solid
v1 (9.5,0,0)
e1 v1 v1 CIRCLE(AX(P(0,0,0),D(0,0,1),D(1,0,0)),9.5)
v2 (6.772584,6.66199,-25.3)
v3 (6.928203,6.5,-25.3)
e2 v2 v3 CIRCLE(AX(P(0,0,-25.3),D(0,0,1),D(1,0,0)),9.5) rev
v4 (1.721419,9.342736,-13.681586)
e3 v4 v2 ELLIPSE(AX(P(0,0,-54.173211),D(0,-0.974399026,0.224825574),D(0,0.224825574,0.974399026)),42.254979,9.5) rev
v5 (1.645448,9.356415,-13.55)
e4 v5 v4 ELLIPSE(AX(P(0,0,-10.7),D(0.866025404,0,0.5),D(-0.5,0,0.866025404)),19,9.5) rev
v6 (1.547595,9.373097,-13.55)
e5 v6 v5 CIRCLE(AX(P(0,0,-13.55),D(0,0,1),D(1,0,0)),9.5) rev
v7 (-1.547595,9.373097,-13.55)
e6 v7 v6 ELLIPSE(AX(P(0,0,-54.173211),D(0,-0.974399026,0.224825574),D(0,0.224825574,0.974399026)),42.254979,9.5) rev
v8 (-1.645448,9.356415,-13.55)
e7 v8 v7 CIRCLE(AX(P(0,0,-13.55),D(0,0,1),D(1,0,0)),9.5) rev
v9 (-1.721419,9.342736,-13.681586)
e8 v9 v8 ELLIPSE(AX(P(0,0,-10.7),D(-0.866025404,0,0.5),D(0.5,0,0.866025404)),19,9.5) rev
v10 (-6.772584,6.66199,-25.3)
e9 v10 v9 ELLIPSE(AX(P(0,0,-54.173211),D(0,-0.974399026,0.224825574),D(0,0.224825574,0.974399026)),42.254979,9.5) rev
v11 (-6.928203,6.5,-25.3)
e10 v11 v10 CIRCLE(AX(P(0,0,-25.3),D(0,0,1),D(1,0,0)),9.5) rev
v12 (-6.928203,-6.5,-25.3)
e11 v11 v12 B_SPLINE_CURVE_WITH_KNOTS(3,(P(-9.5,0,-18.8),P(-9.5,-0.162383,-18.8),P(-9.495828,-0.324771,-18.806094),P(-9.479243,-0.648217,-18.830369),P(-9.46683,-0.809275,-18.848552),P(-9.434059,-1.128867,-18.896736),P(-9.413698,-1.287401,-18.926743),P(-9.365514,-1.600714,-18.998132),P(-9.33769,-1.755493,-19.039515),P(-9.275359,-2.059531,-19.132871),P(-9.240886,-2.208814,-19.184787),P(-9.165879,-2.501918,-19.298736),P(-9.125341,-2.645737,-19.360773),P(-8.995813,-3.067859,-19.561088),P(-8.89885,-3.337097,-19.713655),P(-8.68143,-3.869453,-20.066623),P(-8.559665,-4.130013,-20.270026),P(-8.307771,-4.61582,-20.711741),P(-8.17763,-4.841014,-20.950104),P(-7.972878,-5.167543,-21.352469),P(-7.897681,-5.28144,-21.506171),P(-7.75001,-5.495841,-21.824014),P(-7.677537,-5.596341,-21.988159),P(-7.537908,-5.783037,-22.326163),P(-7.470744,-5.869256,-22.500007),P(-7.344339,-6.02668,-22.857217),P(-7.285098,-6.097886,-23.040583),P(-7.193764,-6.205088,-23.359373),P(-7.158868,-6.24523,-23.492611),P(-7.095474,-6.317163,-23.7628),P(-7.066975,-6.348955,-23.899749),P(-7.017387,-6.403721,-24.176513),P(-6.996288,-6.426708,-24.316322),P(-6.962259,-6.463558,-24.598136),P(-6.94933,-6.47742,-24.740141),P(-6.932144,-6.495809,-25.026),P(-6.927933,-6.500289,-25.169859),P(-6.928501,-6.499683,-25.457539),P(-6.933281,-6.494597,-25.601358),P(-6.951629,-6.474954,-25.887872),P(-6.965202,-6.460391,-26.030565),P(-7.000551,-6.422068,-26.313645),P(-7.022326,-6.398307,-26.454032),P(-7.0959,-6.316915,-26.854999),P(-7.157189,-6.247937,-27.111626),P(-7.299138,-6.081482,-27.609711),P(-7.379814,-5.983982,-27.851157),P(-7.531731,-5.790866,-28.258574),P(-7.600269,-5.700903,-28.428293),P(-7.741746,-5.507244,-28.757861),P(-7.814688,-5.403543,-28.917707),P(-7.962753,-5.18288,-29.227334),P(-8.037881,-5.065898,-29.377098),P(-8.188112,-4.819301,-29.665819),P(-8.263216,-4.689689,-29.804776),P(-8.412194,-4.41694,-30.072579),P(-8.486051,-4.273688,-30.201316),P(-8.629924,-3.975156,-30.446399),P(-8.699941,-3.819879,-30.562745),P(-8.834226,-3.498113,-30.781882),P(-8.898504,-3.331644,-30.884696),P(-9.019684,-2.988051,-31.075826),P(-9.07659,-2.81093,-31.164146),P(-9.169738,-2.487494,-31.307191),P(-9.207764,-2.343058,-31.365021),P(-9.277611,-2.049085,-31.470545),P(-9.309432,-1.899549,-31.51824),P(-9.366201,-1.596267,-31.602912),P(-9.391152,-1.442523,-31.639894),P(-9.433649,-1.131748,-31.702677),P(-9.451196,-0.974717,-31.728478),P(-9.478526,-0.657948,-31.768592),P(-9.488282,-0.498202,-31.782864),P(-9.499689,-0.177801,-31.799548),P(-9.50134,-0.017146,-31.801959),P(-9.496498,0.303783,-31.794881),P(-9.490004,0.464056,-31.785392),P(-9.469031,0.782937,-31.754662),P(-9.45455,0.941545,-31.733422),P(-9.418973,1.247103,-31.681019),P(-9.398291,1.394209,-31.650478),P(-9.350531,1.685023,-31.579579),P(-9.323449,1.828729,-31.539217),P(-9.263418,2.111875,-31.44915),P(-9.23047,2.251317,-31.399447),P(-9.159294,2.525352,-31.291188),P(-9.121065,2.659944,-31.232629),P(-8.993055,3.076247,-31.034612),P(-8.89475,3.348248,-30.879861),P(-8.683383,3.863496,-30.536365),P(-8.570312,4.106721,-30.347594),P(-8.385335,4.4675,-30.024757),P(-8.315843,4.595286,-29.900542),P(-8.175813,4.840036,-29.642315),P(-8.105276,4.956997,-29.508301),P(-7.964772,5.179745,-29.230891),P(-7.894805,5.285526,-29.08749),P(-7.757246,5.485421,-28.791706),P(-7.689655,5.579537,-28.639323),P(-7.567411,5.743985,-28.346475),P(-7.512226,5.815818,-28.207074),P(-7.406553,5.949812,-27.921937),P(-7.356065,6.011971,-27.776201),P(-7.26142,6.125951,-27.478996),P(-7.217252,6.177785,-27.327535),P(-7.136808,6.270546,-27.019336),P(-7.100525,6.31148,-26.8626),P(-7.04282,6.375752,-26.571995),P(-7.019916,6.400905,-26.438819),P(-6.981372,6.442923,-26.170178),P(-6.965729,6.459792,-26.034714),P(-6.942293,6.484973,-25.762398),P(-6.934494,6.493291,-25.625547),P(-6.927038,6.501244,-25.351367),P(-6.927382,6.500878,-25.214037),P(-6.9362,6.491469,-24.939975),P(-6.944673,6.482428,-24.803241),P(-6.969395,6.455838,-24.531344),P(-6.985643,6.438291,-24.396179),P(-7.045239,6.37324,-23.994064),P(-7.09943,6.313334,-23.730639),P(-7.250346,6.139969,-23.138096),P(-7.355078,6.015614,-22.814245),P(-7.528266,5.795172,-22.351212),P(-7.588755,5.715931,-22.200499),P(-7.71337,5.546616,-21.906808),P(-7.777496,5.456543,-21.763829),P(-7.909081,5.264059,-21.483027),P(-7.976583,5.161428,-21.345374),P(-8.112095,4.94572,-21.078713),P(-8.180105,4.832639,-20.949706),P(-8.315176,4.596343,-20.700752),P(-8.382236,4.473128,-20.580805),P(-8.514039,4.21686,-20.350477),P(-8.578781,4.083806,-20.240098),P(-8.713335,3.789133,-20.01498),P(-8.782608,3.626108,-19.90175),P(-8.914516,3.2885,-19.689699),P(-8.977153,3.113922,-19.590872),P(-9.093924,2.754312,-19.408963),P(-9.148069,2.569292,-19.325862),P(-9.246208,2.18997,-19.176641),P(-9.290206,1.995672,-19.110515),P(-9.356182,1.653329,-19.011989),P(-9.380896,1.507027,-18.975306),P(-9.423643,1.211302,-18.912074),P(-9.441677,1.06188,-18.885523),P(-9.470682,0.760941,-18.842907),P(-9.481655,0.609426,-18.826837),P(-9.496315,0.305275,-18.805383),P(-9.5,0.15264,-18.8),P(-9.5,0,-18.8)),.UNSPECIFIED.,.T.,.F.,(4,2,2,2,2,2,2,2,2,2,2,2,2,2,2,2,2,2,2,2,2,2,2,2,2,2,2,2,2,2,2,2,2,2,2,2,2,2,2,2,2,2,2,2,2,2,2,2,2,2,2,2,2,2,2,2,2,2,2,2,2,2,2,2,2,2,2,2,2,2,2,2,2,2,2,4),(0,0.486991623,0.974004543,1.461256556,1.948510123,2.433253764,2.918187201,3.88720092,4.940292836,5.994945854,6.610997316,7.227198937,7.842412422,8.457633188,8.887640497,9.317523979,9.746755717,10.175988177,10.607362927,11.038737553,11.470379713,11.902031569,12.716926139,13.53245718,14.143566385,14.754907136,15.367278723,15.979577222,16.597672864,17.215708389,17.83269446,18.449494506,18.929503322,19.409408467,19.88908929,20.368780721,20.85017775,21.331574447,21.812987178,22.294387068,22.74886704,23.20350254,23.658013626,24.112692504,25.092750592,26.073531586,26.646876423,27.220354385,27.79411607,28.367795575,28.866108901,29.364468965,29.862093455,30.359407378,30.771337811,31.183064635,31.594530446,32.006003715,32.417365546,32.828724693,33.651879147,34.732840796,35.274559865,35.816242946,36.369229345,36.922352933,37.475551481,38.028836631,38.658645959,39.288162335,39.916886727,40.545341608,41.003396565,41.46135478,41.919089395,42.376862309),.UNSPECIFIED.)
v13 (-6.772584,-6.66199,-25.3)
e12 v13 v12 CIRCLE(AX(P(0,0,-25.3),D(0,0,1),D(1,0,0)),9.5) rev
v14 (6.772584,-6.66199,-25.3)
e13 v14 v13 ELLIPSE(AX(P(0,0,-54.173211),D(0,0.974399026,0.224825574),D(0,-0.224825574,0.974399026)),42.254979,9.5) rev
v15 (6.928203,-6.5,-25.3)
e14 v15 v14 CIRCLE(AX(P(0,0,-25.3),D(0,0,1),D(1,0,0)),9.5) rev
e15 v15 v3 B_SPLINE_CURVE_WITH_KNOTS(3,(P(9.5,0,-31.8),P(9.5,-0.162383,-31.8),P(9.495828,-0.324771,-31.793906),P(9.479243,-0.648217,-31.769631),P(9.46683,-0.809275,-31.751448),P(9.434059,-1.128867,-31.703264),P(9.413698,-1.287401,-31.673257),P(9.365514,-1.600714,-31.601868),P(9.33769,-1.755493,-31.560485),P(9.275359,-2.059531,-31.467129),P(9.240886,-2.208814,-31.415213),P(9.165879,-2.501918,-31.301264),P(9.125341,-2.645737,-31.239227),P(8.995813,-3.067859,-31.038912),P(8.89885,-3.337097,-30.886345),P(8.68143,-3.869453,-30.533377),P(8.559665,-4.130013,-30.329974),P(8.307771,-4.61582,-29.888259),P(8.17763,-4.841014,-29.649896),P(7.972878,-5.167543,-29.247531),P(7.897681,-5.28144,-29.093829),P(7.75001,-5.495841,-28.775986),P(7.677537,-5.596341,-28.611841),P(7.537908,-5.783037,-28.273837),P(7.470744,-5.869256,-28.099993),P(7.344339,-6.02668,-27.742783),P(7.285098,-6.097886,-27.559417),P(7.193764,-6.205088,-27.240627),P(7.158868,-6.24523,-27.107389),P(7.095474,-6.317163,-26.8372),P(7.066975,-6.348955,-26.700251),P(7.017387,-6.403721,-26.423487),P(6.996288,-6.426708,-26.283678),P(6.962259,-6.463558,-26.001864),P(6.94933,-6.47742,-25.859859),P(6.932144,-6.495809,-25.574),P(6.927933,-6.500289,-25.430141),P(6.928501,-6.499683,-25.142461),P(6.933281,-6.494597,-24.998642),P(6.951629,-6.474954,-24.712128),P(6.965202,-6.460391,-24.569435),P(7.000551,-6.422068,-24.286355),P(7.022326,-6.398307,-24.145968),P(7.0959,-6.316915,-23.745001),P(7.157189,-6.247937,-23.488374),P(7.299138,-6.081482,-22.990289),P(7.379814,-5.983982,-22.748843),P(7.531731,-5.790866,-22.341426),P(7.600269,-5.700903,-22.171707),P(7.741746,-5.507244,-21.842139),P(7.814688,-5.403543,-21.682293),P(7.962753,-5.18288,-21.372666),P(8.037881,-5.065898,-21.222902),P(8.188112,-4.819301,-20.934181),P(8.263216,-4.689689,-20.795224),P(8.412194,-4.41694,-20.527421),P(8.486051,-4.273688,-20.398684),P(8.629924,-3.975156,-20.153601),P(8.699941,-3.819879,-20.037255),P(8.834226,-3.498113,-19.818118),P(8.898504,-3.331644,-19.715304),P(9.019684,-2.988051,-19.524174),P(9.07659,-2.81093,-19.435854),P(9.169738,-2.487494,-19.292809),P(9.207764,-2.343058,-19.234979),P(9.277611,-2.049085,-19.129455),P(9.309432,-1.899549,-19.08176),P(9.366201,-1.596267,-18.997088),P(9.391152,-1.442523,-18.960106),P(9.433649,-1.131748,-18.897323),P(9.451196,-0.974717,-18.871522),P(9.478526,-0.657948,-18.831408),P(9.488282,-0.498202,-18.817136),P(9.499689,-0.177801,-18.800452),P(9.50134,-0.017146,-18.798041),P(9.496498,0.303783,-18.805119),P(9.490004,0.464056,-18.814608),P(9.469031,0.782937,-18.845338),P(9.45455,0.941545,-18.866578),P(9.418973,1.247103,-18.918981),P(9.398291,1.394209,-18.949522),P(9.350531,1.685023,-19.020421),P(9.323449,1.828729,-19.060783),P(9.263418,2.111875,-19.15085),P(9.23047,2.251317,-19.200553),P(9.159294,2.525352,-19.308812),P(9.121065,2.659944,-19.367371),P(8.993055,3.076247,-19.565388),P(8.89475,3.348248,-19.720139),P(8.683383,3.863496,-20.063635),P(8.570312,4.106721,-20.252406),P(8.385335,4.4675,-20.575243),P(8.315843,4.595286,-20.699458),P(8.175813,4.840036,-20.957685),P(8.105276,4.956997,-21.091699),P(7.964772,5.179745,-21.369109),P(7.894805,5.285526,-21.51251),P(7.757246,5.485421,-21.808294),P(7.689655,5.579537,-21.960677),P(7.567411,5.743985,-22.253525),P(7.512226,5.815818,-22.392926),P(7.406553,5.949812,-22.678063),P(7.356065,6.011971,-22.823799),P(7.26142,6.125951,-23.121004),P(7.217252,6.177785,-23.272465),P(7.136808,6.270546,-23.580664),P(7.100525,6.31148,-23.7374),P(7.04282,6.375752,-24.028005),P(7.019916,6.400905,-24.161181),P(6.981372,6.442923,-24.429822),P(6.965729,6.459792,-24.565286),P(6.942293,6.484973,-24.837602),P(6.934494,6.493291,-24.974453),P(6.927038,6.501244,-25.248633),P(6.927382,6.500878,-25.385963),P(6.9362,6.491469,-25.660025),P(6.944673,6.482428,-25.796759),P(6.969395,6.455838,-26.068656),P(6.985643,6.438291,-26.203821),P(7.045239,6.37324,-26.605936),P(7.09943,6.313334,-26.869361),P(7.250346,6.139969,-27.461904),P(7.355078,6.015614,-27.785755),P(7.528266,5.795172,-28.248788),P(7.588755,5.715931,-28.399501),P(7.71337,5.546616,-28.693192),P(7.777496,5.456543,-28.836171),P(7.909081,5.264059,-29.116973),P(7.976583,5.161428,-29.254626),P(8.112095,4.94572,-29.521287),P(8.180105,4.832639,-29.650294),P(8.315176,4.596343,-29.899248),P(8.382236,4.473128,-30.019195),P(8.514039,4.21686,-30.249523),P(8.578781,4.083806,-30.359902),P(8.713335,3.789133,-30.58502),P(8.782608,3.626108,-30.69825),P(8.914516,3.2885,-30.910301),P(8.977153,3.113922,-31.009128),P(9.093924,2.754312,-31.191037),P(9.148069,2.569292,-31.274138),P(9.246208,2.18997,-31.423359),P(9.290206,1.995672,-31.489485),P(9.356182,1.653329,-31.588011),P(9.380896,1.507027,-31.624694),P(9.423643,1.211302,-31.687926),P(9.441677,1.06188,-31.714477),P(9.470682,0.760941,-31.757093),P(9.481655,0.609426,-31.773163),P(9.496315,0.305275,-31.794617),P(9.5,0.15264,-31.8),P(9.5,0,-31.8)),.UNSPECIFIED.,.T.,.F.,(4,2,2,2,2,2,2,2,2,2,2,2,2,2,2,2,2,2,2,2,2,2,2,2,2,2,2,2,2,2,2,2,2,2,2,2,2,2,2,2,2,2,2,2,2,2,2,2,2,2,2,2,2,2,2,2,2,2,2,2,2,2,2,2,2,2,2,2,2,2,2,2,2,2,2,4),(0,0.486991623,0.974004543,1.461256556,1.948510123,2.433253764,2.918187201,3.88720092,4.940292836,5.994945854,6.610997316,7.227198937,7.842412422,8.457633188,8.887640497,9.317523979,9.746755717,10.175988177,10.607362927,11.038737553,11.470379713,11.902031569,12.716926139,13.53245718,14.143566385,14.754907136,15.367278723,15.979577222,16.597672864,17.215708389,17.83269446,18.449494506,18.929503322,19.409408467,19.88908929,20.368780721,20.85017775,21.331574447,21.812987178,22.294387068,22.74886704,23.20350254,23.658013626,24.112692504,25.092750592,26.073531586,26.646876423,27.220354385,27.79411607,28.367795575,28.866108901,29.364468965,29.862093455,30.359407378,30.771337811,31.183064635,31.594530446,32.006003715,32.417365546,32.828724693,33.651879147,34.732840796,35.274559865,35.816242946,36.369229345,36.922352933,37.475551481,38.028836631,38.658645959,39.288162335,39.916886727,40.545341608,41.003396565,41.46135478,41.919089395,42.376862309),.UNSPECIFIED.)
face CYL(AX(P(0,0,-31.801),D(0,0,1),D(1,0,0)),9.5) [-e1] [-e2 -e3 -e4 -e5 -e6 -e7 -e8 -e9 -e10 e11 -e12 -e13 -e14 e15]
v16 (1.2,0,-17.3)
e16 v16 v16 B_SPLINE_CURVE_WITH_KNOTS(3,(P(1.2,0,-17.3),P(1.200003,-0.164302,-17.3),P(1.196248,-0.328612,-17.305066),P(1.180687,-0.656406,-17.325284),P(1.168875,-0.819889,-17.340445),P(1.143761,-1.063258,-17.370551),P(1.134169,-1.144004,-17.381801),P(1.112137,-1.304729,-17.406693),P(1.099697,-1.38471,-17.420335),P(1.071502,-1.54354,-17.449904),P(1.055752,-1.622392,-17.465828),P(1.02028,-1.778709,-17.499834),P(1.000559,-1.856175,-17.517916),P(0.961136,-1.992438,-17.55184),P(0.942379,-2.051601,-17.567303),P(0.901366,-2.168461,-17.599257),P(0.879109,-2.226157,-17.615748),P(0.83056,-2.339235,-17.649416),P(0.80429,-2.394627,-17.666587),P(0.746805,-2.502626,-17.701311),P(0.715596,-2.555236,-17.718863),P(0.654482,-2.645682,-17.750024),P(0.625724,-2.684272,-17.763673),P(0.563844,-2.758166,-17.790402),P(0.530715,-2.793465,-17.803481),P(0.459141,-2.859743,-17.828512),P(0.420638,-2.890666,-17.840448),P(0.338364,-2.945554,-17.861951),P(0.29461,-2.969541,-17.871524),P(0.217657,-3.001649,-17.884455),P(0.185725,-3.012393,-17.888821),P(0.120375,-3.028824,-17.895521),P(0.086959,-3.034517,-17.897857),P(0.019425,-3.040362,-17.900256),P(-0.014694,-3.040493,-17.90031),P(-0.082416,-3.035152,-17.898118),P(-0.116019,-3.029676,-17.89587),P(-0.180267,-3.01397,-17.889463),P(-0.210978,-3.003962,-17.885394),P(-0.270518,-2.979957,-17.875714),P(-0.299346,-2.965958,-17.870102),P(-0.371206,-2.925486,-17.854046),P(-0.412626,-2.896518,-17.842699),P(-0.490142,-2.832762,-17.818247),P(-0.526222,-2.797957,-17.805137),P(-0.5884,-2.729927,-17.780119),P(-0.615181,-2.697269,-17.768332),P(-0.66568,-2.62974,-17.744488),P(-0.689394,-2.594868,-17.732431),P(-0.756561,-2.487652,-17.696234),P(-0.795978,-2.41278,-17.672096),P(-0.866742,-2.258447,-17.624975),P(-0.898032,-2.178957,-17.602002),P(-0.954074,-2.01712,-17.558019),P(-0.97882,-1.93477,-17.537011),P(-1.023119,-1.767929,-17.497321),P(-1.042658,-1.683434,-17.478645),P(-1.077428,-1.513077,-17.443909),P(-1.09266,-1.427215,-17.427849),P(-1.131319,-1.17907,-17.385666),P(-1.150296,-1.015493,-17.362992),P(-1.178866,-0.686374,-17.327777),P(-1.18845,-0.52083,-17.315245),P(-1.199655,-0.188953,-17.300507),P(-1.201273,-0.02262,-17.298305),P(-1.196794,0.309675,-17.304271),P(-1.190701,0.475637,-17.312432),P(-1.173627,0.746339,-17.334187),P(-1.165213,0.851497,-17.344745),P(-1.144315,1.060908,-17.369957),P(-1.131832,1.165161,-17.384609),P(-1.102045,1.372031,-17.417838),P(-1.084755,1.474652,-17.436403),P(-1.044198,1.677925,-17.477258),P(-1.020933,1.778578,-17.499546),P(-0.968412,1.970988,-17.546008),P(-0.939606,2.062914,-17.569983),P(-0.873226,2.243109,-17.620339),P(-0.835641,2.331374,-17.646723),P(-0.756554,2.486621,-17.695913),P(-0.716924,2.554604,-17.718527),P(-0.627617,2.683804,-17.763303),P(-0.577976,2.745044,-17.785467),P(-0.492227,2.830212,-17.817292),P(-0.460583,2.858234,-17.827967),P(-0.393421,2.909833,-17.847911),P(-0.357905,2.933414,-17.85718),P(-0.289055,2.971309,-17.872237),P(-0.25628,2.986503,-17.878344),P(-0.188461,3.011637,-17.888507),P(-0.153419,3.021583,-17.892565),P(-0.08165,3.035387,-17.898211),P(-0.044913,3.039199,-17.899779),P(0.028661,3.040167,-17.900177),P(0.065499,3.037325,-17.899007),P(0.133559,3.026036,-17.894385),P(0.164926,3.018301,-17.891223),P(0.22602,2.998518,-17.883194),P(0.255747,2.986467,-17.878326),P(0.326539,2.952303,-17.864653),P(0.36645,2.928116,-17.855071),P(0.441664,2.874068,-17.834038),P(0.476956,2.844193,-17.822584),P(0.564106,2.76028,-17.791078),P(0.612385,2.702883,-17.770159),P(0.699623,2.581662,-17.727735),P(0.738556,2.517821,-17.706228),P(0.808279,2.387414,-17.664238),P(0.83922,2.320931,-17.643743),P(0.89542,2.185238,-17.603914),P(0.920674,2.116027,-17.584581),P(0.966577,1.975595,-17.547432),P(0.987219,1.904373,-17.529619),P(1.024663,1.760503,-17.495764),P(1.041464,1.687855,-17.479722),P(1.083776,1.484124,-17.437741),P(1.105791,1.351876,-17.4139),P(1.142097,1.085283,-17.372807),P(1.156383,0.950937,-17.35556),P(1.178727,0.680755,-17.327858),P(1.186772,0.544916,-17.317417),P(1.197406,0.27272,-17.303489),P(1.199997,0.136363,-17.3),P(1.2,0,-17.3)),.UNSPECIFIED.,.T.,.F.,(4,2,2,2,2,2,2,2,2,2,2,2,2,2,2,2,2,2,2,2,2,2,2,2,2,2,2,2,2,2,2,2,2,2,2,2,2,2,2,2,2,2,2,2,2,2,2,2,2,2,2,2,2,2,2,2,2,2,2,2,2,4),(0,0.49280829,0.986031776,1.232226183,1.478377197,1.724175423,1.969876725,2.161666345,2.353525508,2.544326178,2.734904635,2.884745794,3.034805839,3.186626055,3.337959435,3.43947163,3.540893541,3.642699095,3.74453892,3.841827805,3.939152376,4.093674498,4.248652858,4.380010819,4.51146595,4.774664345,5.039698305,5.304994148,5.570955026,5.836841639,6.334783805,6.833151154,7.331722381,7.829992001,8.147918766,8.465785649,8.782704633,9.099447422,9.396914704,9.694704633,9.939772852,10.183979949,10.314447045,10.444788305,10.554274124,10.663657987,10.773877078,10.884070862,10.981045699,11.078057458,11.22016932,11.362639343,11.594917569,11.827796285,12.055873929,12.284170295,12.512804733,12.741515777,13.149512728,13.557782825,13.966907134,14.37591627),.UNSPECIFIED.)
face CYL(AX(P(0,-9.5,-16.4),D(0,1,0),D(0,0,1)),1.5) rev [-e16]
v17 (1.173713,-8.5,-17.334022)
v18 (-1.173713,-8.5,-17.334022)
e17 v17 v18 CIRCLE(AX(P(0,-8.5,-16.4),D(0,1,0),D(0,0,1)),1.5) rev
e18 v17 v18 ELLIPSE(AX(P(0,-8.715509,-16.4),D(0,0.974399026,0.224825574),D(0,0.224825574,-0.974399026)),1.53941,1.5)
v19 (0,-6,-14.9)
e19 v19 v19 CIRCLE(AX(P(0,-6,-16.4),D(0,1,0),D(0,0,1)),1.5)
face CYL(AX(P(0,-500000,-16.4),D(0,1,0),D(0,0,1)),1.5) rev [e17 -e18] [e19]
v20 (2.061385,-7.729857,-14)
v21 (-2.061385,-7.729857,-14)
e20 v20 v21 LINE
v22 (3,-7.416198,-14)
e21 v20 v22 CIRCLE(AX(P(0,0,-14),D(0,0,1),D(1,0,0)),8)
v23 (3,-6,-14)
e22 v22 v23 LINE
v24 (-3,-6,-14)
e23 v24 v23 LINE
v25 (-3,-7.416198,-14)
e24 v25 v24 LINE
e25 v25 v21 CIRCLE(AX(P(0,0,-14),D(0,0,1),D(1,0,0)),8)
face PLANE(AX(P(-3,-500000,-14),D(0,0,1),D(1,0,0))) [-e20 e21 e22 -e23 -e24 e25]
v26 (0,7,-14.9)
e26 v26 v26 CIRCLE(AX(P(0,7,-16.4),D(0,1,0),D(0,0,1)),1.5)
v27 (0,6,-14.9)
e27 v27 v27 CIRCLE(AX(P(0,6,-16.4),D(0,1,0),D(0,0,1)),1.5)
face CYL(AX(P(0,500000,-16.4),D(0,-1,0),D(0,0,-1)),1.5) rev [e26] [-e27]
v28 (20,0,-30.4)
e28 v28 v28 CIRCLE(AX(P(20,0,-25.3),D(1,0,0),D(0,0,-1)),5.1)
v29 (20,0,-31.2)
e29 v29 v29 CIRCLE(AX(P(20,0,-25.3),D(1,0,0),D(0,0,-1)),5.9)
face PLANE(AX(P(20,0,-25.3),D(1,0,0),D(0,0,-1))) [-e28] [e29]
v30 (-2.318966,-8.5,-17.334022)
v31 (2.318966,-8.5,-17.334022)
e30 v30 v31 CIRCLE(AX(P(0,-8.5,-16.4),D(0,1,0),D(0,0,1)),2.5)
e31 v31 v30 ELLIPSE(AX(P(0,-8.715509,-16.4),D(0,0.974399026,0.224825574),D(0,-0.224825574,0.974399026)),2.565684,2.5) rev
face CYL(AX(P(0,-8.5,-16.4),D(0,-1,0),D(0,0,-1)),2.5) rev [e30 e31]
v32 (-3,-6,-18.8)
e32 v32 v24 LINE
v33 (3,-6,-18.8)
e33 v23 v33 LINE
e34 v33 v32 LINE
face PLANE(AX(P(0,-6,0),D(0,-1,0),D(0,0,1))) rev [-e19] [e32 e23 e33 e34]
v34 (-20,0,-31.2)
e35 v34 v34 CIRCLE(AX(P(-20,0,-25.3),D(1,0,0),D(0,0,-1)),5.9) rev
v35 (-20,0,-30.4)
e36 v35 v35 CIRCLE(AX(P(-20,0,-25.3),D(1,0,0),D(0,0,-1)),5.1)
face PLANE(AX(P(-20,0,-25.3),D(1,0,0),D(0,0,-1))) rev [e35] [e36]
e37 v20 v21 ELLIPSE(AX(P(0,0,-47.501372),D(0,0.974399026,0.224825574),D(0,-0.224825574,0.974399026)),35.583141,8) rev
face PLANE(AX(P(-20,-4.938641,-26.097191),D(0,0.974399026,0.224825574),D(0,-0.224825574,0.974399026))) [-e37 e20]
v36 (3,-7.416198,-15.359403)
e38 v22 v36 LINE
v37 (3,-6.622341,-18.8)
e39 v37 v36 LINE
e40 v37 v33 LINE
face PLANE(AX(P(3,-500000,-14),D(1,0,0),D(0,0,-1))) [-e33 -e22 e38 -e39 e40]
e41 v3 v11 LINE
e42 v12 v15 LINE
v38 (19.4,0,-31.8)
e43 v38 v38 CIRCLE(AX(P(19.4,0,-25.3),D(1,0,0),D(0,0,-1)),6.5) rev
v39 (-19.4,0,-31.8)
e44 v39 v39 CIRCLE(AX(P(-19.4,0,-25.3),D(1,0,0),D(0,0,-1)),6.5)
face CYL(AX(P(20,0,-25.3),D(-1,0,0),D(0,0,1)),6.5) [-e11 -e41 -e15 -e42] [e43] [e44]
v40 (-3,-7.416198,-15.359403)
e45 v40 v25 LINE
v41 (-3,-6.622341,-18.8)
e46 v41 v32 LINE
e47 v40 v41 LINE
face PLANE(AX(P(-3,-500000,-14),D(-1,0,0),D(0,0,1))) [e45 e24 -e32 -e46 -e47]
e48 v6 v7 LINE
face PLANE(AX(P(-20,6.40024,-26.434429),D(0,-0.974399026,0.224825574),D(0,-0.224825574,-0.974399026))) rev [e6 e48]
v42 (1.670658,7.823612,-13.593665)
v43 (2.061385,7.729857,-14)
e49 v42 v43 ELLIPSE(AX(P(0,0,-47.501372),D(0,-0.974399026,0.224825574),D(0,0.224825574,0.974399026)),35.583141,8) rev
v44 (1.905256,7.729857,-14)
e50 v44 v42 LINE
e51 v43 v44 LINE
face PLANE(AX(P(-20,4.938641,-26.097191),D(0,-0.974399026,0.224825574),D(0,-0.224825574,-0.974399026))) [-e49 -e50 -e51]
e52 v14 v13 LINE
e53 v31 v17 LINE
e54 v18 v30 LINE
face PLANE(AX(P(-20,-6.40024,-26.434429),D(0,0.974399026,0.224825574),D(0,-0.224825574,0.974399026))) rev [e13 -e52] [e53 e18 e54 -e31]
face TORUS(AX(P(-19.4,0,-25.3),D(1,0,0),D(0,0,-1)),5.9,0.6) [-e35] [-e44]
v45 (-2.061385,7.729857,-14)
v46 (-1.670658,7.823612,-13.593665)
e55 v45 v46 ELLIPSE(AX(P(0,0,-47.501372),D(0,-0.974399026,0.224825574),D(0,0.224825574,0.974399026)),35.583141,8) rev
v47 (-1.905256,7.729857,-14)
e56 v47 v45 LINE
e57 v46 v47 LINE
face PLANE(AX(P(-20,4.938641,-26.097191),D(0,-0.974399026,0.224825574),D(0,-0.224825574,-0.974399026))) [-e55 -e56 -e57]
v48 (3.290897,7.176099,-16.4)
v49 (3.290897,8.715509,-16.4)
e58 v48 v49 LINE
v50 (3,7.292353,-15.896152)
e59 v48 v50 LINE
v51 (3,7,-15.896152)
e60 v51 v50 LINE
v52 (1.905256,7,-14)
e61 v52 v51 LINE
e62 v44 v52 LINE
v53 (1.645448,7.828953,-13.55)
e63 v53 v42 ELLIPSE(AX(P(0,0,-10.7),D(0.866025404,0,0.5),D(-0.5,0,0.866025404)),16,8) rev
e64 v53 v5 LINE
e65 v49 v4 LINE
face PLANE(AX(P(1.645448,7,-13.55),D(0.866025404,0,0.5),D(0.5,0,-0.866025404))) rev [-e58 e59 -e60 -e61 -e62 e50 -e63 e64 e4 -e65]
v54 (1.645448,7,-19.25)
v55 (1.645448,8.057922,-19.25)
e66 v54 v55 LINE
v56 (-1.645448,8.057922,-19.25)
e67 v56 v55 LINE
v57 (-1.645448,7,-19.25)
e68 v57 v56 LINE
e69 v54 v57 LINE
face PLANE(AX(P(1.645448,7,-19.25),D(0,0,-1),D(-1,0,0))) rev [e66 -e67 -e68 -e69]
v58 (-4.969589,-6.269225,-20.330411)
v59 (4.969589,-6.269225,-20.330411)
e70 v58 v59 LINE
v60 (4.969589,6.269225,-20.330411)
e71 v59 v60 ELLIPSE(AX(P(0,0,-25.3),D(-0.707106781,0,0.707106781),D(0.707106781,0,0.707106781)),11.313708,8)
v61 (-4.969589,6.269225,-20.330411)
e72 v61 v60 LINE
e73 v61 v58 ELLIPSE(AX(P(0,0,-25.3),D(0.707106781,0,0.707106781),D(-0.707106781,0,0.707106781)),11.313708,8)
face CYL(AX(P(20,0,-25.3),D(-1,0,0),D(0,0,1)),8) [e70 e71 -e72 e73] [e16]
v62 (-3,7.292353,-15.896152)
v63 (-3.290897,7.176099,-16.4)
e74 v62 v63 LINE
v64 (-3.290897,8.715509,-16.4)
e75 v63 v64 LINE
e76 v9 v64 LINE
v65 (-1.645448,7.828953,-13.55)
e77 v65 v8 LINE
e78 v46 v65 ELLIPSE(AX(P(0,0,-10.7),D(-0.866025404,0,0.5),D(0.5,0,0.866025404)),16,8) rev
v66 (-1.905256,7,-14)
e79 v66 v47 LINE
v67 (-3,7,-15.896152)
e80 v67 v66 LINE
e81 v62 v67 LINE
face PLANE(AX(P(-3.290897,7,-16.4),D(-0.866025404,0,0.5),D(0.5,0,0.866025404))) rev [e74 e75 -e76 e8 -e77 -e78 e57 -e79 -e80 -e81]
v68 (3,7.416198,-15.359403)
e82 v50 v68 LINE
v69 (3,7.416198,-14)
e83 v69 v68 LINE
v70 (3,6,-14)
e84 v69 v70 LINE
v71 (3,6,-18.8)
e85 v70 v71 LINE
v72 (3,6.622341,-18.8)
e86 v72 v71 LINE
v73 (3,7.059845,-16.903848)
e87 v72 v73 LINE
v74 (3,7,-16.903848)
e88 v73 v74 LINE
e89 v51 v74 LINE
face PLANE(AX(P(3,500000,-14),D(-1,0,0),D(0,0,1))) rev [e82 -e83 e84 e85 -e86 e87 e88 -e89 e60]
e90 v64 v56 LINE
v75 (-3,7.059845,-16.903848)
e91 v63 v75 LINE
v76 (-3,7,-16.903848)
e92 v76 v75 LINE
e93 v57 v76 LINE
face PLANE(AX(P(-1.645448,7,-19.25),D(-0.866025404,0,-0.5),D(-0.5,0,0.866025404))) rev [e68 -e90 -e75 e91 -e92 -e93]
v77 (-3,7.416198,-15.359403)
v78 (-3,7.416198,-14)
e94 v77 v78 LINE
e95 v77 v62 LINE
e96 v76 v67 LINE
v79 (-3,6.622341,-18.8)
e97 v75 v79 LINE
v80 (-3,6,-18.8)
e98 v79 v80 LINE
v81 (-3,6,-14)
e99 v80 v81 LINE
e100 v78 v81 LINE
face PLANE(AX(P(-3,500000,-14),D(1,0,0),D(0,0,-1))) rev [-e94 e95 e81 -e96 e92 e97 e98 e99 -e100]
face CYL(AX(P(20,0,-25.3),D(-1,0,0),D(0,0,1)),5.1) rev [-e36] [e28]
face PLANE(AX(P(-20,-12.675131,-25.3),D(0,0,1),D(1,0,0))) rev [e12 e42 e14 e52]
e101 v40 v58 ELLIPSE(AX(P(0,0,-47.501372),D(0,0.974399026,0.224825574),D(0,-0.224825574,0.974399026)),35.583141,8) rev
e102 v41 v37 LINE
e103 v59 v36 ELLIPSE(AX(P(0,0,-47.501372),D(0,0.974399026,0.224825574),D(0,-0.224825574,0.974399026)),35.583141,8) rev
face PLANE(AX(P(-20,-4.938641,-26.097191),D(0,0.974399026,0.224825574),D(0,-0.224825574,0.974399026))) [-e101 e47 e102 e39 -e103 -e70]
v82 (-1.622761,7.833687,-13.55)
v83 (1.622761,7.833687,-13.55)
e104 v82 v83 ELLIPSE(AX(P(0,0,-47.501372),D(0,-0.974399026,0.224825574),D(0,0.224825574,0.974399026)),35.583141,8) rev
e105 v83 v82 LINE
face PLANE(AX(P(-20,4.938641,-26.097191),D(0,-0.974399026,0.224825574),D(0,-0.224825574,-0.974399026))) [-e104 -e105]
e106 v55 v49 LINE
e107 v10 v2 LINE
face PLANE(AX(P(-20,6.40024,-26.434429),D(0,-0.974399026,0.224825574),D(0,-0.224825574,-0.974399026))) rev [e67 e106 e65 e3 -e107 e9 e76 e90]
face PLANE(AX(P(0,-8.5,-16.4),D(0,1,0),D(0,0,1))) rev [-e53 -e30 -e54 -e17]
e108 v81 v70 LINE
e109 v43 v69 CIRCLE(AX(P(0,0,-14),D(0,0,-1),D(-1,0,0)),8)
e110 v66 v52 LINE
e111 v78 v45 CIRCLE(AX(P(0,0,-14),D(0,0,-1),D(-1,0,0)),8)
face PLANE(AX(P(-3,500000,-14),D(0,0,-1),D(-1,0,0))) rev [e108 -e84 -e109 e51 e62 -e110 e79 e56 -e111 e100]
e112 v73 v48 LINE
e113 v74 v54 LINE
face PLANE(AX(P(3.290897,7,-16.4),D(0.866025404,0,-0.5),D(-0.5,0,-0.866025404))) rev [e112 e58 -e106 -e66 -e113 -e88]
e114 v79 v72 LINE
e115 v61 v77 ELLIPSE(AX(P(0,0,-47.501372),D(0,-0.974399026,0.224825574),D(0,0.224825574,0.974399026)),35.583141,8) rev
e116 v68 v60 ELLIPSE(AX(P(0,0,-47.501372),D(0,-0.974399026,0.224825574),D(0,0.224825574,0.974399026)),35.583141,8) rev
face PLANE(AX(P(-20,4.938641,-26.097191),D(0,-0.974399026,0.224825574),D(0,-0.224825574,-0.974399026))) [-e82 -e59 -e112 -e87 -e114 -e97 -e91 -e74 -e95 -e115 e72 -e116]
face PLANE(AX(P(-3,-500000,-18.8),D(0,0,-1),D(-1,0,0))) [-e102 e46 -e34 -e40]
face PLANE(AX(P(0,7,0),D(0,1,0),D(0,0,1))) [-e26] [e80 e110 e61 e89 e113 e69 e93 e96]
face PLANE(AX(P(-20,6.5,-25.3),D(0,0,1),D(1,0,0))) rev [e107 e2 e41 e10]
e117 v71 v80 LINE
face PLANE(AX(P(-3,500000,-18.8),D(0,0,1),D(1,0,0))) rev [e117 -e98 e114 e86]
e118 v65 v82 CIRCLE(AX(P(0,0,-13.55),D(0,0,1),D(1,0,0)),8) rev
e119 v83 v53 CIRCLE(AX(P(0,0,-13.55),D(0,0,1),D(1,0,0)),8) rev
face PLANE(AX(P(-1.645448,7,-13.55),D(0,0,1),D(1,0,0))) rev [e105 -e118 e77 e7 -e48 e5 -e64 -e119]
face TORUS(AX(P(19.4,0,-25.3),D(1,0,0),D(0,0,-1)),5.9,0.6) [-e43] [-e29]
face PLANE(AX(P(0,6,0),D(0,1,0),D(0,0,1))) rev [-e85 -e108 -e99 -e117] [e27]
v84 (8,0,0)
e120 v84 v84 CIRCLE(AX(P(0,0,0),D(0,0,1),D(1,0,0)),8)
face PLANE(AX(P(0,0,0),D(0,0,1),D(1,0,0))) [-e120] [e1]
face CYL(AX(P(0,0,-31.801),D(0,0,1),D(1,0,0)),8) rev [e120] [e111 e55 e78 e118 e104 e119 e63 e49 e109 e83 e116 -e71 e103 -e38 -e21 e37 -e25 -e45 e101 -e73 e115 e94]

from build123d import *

# Parameters (mm, degrees)
SKETCH_3_R               = 6.5
SKETCH_3_R_2             = 5.1
EXTRUDE_1_DEPTH          = 20
EXTRUDE_START            = -18.7999999
EXTRUDE_2_OUTLINE_R      = 9.5
EXTRUDE_2_DEPTH          = 18.7999999
EXTRUDE_START_2          = -31.801
EXTRUDE_2_2_OUTLINE_R    = 9.5
EXTRUDE_2_2_DEPTH        = 0.0009999
EXTRUDE_START_3          = -31.8000001
EXTRUDE_2_3_OUTLINE_R    = 9.5
EXTRUDE_2_3_DEPTH        = 13.0000002
EXTRUDE_START_4          = -9.5000001
EXTRUDE_2_4_OUTLINE_R    = 6.5
EXTRUDE_2_4_DEPTH        = 19.5000001
CUT_EXTRUDE_1_DEPTH      = 39.749885281
CUT_EXTRUDE_1_DEPTH_BACK = 39.749885281
CUT_EXTRUDE_2_DEPTH      = 39.749064529
CUT_EXTRUDE_2_DEPTH_BACK = 39.749064529
SHELL_1_T                = -1.5
FILLET_1_R               = 0.6
EXTRUDE_START_5          = 6
SKETCH_6_W               = 4.8
SKETCH_6_H               = 6
SKETCH_6_R               = 1.5
EXTRUDE_3_DEPTH          = 1.729857
CUT_EXTRUDE_3_DEPTH      = 39.749064611
CUT_EXTRUDE_3_DEPTH_BACK = 39.749064611
SKETCH_6_2_R             = 1.5
CUT_EXTRUDE_START        = 9.5
CUT_EXTRUDE_4_DEPTH      = 2.5
CUT_EXTRUDE_START_2      = -9.5
SKETCH_8_R               = 2.5
CUT_EXTRUDE_5_DEPTH      = 1


with BuildPart() as part:
    # 草圖3 → 填料-伸長1 (new, symmetric)
    with BuildSketch(Plane(origin=(0, 0, 0), x_dir=(0, 0, -1), z_dir=(1, 0, 0))):
        with Locations((25.3, 0)):
            Circle(SKETCH_3_R)
        with Locations((25.3, 0)):
            Circle(SKETCH_3_R_2, mode=Mode.SUBTRACT)
    extrude(amount=EXTRUDE_1_DEPTH, both=True)

    # 圓角1
    fillet_1_edges = [part.edges().sort_by_distance(p)[0] for p in [
        (-20, 0, -18.8),
        (20, 0, -18.8),
    ]]
    fillet(fillet_1_edges, radius=FILLET_1_R)



with BuildPart() as body_2:
    # 填料-伸長2: read off the stored shape, not the designer's step
    # 填料-伸長2 outline → 填料-伸長2 (new body)
    with BuildSketch(Plane.XY.offset(EXTRUDE_START)):
        Circle(EXTRUDE_2_OUTLINE_R)
    extrude(amount=EXTRUDE_2_DEPTH)

    # Extrude 2 2 outline → Extrude 2 2 (add)
    with BuildSketch(Plane.XY.offset(EXTRUDE_START_2)):
        Circle(EXTRUDE_2_2_OUTLINE_R)
    extrude(amount=EXTRUDE_2_2_DEPTH)

    # Extrude 2 3 outline → Extrude 2 3 (add)
    with BuildSketch(Plane.XY.offset(EXTRUDE_START_3)):
        Circle(EXTRUDE_2_3_OUTLINE_R)
    extrude(amount=EXTRUDE_2_3_DEPTH)

    # Extrude 2 4 outline → Extrude 2 4 (cut)
    with BuildSketch(Plane.YZ.offset(EXTRUDE_START_4)):
        with Locations((0, -25.3)):
            Circle(EXTRUDE_2_4_OUTLINE_R)
    extrude(amount=EXTRUDE_2_4_DEPTH, mode=Mode.SUBTRACT)

    # 草圖4 → 除料-伸長1 (cut, two sides: drawn at the far end of the back side and taken through both)
    with BuildSketch(Plane(origin=(0, 0, 0), x_dir=(0, 0, -1), z_dir=(1, 0, 0)).offset(-CUT_EXTRUDE_1_DEPTH_BACK)):
        with BuildLine():
            Line((25.3, -12.675131419), (25.3, -6.5))
            ThreePointArc((25.3, -6.5), (31.8, 0), (25.3, 6.5))
            Line((25.3, 6.5), (25.3, 12.675131419))
            ThreePointArc((25.3, 12.675131419), (37.975131419, 0), (25.3, -12.675131419))
        make_face()
    extrude(amount=CUT_EXTRUDE_1_DEPTH + CUT_EXTRUDE_1_DEPTH_BACK, mode=Mode.SUBTRACT)

    # 草圖5 → 除料-伸長2 (cut, two sides: drawn at the far end of the back side and taken through both)
    with BuildSketch(Plane(origin=(0, 0, 0), x_dir=(0, 0, -1), z_dir=(1, 0, 0)).offset(-CUT_EXTRUDE_2_DEPTH_BACK)):
        Polygon((26.434429002, 6.400239905), (13, 9.5), (13, 10.602524511), (26.434429002, 10.602524511), align=None)
        Polygon((13, -10.602524511), (13, -9.5), (26.434429002, -6.400239905), (26.434429002, -10.602524511), align=None)
    extrude(amount=CUT_EXTRUDE_2_DEPTH + CUT_EXTRUDE_2_DEPTH_BACK, mode=Mode.SUBTRACT)

    # 薄殼1
    shell_1_openings = [body_2.faces().sort_by_distance(p)[0] for p in [
        (0, 0, 0),
    ]]
    offset(amount=SHELL_1_T, openings=shell_1_openings)


with BuildPart() as part_1:
    add(part.part)

    add(body_2.part)  # 填料-伸長3 merges body 2
    # 草圖6 → 填料-伸長3 (add)
    with BuildSketch(Plane(origin=(0, 0, 0), x_dir=(0, 0, -1), z_dir=(0, 1, 0)).offset(EXTRUDE_START_5)):
        with Locations((16.4, 0)):
            Rectangle(SKETCH_6_W, SKETCH_6_H)
        with Locations((16.4, 0)):
            Circle(SKETCH_6_R, mode=Mode.SUBTRACT)
    extrude_3 = extrude(amount=EXTRUDE_3_DEPTH)

    # 鏡射1: 填料-伸長3 across plane
    add(extrude_3.mirror(Plane.ZX))

    # 草圖6<2> → 除料-伸長3 (cut, two sides: drawn at the far end of the back side and taken through both)
    with BuildSketch(Plane(origin=(0, 0, 0), x_dir=(0, 0, -1), z_dir=(0, 1, 0)).offset(-CUT_EXTRUDE_3_DEPTH_BACK)):
        with Locations(Location((16.4, 0, 0), (0, 0, 180))):
            Circle(SKETCH_6_2_R)
    extrude(amount=CUT_EXTRUDE_3_DEPTH + CUT_EXTRUDE_3_DEPTH_BACK, mode=Mode.SUBTRACT)

    # 草圖7 → 除料-伸長4 (cut)
    with BuildSketch(Plane(origin=(0, 0, 0), x_dir=(1, 0, 0), z_dir=(0, 1, 0)).offset(CUT_EXTRUDE_START)):
        Polygon((3.290896534, 16.4), (1.645448267, 19.25), (-1.645448267, 19.25), (-3.290896534, 16.4), (-1.645448267, 13.55), (1.645448267, 13.55), align=None)
    extrude(amount=-CUT_EXTRUDE_4_DEPTH, mode=Mode.SUBTRACT)

    # 草圖8 → 除料-伸長5 (cut)
    with BuildSketch(Plane(origin=(0, 0, 0), x_dir=(1, 0, 0), z_dir=(0, 1, 0)).offset(CUT_EXTRUDE_START_2)):
        with Locations((0, 16.4)):
            Circle(SKETCH_8_R)
    extrude(amount=CUT_EXTRUDE_5_DEPTH, mode=Mode.SUBTRACT)


solid = part_1.part
